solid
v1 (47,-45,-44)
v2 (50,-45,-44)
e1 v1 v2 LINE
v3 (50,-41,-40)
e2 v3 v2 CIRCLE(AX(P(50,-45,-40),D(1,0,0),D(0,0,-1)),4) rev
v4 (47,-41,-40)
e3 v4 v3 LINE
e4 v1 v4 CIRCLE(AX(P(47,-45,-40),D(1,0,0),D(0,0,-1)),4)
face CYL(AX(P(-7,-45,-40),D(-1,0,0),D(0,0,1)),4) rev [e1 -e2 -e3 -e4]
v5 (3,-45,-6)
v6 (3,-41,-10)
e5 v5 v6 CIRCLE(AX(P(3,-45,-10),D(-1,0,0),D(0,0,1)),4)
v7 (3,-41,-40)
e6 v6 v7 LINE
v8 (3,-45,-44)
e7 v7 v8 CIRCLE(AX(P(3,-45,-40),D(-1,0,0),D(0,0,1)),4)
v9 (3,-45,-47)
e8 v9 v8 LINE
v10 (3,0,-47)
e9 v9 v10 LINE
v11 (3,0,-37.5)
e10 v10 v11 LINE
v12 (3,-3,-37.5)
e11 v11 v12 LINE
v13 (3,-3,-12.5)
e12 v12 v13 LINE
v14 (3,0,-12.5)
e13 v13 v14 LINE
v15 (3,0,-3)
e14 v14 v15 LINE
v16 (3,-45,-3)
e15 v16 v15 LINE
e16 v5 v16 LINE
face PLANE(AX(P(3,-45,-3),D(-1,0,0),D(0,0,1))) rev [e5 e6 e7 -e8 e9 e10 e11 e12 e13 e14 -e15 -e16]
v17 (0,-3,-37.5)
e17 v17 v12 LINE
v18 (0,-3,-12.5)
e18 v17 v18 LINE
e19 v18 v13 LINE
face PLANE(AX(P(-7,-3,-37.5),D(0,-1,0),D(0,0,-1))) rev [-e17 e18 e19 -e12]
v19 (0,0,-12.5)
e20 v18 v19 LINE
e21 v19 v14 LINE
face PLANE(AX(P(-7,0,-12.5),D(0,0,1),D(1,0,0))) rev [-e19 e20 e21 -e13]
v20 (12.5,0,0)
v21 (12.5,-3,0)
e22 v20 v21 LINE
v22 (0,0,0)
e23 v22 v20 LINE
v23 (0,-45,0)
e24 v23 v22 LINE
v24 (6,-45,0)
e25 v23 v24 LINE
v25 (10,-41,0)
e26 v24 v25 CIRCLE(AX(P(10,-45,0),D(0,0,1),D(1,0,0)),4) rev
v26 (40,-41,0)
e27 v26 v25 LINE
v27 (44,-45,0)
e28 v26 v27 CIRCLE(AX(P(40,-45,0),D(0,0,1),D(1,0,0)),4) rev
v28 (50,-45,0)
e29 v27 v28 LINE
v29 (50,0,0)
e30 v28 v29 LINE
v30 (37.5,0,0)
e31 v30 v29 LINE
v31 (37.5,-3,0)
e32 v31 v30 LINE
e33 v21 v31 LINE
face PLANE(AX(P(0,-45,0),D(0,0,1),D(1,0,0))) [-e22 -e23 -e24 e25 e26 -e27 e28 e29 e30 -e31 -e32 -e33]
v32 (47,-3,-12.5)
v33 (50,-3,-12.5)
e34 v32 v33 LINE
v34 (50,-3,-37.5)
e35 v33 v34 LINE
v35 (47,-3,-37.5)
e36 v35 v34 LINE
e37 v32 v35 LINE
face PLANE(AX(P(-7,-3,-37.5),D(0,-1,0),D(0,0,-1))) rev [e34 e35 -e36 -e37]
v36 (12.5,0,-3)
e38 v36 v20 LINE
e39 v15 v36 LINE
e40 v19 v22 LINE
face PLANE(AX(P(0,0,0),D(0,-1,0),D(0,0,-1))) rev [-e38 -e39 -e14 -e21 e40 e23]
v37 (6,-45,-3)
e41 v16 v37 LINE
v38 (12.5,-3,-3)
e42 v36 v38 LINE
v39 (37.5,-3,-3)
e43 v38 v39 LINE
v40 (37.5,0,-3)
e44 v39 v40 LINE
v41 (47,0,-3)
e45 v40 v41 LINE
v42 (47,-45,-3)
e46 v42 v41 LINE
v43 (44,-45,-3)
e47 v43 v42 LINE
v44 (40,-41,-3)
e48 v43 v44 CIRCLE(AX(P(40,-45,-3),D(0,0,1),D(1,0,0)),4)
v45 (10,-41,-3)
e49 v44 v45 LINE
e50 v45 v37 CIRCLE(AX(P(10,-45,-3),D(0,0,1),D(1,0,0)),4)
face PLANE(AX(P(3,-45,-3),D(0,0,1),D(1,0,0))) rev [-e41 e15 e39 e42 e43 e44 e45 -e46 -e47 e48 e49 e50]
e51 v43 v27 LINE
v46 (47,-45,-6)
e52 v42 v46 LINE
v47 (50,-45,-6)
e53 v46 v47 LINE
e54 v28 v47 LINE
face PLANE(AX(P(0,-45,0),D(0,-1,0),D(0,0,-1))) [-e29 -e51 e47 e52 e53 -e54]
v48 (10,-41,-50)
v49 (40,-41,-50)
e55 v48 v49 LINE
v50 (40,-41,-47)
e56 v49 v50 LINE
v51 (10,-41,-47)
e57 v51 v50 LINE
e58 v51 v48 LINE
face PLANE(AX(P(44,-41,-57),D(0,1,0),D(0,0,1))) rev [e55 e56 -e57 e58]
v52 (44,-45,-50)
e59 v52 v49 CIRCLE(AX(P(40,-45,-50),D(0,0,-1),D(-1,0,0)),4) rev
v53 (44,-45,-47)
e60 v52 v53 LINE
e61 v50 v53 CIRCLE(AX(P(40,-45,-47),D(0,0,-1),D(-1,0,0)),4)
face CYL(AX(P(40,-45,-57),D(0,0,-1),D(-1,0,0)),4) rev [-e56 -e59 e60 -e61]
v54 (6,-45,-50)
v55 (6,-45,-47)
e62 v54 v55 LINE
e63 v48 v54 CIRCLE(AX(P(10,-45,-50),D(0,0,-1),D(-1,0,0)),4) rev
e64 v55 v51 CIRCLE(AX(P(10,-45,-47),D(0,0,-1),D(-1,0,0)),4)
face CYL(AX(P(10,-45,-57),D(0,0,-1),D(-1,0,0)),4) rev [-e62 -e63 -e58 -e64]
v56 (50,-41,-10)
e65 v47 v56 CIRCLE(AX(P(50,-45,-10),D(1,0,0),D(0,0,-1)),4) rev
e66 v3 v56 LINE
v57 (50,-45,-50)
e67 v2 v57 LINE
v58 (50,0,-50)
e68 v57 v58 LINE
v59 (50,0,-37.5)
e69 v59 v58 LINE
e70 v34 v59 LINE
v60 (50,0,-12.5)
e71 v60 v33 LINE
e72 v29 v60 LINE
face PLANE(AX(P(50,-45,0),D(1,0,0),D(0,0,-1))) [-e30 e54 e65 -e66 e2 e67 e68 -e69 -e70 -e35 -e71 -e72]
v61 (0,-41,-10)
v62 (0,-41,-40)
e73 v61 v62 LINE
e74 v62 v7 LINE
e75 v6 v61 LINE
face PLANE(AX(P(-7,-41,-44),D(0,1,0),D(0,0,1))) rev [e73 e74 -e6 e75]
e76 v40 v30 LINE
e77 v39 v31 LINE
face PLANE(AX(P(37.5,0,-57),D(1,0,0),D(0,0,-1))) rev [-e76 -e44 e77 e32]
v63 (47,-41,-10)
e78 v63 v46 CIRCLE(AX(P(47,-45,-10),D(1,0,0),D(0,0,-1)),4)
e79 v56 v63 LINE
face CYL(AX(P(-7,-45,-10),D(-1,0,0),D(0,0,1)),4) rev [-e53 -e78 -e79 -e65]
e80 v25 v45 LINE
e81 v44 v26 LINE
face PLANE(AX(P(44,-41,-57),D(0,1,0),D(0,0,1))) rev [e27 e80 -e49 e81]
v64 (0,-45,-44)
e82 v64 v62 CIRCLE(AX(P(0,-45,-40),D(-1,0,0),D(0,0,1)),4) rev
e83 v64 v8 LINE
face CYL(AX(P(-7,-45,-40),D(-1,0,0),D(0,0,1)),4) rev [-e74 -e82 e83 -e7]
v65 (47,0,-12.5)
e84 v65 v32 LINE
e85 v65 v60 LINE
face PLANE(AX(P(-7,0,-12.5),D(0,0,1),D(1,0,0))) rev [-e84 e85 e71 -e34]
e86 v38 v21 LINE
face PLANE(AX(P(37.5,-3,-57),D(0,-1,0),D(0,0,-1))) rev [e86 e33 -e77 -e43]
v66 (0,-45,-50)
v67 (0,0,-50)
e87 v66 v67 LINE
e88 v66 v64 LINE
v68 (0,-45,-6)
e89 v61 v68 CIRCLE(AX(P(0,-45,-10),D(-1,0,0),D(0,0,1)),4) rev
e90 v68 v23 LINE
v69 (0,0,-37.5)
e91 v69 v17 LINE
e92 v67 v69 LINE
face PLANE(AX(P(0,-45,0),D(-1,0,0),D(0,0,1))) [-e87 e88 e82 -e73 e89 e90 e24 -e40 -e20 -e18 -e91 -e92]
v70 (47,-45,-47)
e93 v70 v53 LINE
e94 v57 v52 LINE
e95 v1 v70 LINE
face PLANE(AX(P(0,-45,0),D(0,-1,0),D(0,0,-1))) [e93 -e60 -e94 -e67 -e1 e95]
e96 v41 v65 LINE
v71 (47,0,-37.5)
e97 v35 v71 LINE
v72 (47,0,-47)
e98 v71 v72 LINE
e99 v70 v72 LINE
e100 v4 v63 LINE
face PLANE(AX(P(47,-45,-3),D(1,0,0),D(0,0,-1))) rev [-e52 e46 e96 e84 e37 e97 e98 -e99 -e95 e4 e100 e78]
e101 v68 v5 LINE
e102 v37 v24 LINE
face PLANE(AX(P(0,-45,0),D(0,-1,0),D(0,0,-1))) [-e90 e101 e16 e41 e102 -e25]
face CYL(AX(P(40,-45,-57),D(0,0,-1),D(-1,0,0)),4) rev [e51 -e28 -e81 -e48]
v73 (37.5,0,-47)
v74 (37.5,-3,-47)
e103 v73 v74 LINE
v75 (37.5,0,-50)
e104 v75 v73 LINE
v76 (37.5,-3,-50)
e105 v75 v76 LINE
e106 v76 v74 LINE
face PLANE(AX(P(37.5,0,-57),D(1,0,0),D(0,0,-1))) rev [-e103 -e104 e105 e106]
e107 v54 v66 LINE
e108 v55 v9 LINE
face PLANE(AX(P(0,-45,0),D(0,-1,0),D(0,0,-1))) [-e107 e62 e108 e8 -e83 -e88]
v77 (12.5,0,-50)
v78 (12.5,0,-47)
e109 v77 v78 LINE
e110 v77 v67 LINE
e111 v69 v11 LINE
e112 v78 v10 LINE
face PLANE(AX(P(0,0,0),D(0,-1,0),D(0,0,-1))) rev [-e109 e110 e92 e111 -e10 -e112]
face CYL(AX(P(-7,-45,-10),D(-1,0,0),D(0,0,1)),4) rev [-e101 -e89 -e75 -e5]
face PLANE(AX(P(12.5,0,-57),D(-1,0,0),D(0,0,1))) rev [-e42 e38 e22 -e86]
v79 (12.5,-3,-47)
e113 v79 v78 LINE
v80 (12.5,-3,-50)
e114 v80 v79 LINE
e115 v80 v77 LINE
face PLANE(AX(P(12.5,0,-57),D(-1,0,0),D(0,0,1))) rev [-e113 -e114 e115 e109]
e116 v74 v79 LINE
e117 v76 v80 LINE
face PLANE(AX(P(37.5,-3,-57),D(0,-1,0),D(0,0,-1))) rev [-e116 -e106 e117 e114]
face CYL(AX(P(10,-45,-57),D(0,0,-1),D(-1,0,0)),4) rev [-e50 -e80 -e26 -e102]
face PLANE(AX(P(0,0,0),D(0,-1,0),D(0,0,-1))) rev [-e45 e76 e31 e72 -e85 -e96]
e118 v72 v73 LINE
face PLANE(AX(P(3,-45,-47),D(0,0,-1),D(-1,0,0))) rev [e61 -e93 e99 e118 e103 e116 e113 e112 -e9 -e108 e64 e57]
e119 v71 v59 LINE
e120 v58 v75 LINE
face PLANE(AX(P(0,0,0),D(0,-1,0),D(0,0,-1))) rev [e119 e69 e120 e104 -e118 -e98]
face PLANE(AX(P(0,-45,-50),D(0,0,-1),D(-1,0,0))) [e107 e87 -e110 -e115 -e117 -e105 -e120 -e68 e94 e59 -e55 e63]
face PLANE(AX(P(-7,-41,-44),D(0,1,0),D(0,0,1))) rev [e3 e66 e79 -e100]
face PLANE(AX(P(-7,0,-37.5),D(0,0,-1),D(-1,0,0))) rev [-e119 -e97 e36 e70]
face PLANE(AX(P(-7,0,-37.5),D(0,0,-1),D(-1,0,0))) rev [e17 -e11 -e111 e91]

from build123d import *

# Parameters (mm, degrees)
ESQUISSE2_W             = 50
ESQUISSE2_H             = 50
BOSS_EXTRU_2_DEPTH      = 45
ESQUISSE4_W             = 44
ESQUISSE4_H             = 44
ENL_V_MAT_EXTRU_3_DEPTH = 45
ESQUISSE5_W             = 25
ESQUISSE5_H             = 3
ENL_V_MAT_EXTRU_4_DEPTH = 57
ESQUISSE6_W             = 25
ESQUISSE6_H             = 3
ENL_V_MAT_EXTRU_5_DEPTH = 57
ESQUISSE7_W             = 38
ESQUISSE7_H             = 4
ENL_V_MAT_EXTRU_6_DEPTH = 57
ESQUISSE8_W             = 38
ESQUISSE8_H             = 4
ENL_V_MAT_EXTRU_7_DEPTH = 57
CONG_1_R                = 4


with BuildPart() as part:
    # Esquisse2 → Boss.-Extru.2 (new body)
    with BuildSketch(Plane(origin=(0, 0, 0), x_dir=(1, 0, 0), z_dir=(0, 1, 0))):
        with Locations((25, 25)):
            Rectangle(ESQUISSE2_W, ESQUISSE2_H)
    extrude(amount=-BOSS_EXTRU_2_DEPTH)

    # Esquisse4 → Enlèv. mat.-Extru.3 (cut)
    with BuildSketch(Plane(origin=(0, 0, 0), x_dir=(1, 0, 0), z_dir=(0, 1, 0))):
        with Locations((25, 25)):
            Rectangle(ESQUISSE4_W, ESQUISSE4_H)
    extrude(amount=-ENL_V_MAT_EXTRU_3_DEPTH, mode=Mode.SUBTRACT)

    # Esquisse5 → Enlèv. mat.-Extru.4 (cut)
    with BuildSketch(Plane.XY):
        with Locations((25, -1.5)):
            Rectangle(ESQUISSE5_W, ESQUISSE5_H)
    extrude(amount=-ENL_V_MAT_EXTRU_4_DEPTH, mode=Mode.SUBTRACT)

    # Esquisse6 → Enlèv. mat.-Extru.5 (cut)
    with BuildSketch(Plane(origin=(50, 0, 0), x_dir=(0, 0, -1), z_dir=(1, 0, 0))):
        with Locations((25, -1.5)):
            Rectangle(ESQUISSE6_W, ESQUISSE6_H)
    extrude(amount=-ENL_V_MAT_EXTRU_5_DEPTH, mode=Mode.SUBTRACT)

    # Esquisse7 → Enlèv. mat.-Extru.6 (cut)
    with BuildSketch(Plane.XY):
        with Locations((25, -43)):
            Rectangle(ESQUISSE7_W, ESQUISSE7_H)
    extrude(amount=-ENL_V_MAT_EXTRU_6_DEPTH, mode=Mode.SUBTRACT)

    # Esquisse8 → Enlèv. mat.-Extru.7 (cut)
    with BuildSketch(Plane(origin=(50, 0, 0), x_dir=(0, 0, -1), z_dir=(1, 0, 0))):
        with Locations((25, -43)):
            Rectangle(ESQUISSE8_W, ESQUISSE8_H)
    extrude(amount=-ENL_V_MAT_EXTRU_7_DEPTH, mode=Mode.SUBTRACT)

    # Congé1
    cong_1_edges = [part.edges().sort_by_distance(p)[0] for p in [
        (44, -41, -48.5),
        (44, -41, -1.5),
        (6, -41, -1.5),
        (1.5, -41, -6),
        (1.5, -41, -44),
        (6, -41, -48.5),
        (48.5, -41, -44),
        (48.5, -41, -6),
    ]]
    fillet(cong_1_edges, radius=CONG_1_R - 0.0001)  # a hair under: the kernel refuses the full size


solid = part.part
